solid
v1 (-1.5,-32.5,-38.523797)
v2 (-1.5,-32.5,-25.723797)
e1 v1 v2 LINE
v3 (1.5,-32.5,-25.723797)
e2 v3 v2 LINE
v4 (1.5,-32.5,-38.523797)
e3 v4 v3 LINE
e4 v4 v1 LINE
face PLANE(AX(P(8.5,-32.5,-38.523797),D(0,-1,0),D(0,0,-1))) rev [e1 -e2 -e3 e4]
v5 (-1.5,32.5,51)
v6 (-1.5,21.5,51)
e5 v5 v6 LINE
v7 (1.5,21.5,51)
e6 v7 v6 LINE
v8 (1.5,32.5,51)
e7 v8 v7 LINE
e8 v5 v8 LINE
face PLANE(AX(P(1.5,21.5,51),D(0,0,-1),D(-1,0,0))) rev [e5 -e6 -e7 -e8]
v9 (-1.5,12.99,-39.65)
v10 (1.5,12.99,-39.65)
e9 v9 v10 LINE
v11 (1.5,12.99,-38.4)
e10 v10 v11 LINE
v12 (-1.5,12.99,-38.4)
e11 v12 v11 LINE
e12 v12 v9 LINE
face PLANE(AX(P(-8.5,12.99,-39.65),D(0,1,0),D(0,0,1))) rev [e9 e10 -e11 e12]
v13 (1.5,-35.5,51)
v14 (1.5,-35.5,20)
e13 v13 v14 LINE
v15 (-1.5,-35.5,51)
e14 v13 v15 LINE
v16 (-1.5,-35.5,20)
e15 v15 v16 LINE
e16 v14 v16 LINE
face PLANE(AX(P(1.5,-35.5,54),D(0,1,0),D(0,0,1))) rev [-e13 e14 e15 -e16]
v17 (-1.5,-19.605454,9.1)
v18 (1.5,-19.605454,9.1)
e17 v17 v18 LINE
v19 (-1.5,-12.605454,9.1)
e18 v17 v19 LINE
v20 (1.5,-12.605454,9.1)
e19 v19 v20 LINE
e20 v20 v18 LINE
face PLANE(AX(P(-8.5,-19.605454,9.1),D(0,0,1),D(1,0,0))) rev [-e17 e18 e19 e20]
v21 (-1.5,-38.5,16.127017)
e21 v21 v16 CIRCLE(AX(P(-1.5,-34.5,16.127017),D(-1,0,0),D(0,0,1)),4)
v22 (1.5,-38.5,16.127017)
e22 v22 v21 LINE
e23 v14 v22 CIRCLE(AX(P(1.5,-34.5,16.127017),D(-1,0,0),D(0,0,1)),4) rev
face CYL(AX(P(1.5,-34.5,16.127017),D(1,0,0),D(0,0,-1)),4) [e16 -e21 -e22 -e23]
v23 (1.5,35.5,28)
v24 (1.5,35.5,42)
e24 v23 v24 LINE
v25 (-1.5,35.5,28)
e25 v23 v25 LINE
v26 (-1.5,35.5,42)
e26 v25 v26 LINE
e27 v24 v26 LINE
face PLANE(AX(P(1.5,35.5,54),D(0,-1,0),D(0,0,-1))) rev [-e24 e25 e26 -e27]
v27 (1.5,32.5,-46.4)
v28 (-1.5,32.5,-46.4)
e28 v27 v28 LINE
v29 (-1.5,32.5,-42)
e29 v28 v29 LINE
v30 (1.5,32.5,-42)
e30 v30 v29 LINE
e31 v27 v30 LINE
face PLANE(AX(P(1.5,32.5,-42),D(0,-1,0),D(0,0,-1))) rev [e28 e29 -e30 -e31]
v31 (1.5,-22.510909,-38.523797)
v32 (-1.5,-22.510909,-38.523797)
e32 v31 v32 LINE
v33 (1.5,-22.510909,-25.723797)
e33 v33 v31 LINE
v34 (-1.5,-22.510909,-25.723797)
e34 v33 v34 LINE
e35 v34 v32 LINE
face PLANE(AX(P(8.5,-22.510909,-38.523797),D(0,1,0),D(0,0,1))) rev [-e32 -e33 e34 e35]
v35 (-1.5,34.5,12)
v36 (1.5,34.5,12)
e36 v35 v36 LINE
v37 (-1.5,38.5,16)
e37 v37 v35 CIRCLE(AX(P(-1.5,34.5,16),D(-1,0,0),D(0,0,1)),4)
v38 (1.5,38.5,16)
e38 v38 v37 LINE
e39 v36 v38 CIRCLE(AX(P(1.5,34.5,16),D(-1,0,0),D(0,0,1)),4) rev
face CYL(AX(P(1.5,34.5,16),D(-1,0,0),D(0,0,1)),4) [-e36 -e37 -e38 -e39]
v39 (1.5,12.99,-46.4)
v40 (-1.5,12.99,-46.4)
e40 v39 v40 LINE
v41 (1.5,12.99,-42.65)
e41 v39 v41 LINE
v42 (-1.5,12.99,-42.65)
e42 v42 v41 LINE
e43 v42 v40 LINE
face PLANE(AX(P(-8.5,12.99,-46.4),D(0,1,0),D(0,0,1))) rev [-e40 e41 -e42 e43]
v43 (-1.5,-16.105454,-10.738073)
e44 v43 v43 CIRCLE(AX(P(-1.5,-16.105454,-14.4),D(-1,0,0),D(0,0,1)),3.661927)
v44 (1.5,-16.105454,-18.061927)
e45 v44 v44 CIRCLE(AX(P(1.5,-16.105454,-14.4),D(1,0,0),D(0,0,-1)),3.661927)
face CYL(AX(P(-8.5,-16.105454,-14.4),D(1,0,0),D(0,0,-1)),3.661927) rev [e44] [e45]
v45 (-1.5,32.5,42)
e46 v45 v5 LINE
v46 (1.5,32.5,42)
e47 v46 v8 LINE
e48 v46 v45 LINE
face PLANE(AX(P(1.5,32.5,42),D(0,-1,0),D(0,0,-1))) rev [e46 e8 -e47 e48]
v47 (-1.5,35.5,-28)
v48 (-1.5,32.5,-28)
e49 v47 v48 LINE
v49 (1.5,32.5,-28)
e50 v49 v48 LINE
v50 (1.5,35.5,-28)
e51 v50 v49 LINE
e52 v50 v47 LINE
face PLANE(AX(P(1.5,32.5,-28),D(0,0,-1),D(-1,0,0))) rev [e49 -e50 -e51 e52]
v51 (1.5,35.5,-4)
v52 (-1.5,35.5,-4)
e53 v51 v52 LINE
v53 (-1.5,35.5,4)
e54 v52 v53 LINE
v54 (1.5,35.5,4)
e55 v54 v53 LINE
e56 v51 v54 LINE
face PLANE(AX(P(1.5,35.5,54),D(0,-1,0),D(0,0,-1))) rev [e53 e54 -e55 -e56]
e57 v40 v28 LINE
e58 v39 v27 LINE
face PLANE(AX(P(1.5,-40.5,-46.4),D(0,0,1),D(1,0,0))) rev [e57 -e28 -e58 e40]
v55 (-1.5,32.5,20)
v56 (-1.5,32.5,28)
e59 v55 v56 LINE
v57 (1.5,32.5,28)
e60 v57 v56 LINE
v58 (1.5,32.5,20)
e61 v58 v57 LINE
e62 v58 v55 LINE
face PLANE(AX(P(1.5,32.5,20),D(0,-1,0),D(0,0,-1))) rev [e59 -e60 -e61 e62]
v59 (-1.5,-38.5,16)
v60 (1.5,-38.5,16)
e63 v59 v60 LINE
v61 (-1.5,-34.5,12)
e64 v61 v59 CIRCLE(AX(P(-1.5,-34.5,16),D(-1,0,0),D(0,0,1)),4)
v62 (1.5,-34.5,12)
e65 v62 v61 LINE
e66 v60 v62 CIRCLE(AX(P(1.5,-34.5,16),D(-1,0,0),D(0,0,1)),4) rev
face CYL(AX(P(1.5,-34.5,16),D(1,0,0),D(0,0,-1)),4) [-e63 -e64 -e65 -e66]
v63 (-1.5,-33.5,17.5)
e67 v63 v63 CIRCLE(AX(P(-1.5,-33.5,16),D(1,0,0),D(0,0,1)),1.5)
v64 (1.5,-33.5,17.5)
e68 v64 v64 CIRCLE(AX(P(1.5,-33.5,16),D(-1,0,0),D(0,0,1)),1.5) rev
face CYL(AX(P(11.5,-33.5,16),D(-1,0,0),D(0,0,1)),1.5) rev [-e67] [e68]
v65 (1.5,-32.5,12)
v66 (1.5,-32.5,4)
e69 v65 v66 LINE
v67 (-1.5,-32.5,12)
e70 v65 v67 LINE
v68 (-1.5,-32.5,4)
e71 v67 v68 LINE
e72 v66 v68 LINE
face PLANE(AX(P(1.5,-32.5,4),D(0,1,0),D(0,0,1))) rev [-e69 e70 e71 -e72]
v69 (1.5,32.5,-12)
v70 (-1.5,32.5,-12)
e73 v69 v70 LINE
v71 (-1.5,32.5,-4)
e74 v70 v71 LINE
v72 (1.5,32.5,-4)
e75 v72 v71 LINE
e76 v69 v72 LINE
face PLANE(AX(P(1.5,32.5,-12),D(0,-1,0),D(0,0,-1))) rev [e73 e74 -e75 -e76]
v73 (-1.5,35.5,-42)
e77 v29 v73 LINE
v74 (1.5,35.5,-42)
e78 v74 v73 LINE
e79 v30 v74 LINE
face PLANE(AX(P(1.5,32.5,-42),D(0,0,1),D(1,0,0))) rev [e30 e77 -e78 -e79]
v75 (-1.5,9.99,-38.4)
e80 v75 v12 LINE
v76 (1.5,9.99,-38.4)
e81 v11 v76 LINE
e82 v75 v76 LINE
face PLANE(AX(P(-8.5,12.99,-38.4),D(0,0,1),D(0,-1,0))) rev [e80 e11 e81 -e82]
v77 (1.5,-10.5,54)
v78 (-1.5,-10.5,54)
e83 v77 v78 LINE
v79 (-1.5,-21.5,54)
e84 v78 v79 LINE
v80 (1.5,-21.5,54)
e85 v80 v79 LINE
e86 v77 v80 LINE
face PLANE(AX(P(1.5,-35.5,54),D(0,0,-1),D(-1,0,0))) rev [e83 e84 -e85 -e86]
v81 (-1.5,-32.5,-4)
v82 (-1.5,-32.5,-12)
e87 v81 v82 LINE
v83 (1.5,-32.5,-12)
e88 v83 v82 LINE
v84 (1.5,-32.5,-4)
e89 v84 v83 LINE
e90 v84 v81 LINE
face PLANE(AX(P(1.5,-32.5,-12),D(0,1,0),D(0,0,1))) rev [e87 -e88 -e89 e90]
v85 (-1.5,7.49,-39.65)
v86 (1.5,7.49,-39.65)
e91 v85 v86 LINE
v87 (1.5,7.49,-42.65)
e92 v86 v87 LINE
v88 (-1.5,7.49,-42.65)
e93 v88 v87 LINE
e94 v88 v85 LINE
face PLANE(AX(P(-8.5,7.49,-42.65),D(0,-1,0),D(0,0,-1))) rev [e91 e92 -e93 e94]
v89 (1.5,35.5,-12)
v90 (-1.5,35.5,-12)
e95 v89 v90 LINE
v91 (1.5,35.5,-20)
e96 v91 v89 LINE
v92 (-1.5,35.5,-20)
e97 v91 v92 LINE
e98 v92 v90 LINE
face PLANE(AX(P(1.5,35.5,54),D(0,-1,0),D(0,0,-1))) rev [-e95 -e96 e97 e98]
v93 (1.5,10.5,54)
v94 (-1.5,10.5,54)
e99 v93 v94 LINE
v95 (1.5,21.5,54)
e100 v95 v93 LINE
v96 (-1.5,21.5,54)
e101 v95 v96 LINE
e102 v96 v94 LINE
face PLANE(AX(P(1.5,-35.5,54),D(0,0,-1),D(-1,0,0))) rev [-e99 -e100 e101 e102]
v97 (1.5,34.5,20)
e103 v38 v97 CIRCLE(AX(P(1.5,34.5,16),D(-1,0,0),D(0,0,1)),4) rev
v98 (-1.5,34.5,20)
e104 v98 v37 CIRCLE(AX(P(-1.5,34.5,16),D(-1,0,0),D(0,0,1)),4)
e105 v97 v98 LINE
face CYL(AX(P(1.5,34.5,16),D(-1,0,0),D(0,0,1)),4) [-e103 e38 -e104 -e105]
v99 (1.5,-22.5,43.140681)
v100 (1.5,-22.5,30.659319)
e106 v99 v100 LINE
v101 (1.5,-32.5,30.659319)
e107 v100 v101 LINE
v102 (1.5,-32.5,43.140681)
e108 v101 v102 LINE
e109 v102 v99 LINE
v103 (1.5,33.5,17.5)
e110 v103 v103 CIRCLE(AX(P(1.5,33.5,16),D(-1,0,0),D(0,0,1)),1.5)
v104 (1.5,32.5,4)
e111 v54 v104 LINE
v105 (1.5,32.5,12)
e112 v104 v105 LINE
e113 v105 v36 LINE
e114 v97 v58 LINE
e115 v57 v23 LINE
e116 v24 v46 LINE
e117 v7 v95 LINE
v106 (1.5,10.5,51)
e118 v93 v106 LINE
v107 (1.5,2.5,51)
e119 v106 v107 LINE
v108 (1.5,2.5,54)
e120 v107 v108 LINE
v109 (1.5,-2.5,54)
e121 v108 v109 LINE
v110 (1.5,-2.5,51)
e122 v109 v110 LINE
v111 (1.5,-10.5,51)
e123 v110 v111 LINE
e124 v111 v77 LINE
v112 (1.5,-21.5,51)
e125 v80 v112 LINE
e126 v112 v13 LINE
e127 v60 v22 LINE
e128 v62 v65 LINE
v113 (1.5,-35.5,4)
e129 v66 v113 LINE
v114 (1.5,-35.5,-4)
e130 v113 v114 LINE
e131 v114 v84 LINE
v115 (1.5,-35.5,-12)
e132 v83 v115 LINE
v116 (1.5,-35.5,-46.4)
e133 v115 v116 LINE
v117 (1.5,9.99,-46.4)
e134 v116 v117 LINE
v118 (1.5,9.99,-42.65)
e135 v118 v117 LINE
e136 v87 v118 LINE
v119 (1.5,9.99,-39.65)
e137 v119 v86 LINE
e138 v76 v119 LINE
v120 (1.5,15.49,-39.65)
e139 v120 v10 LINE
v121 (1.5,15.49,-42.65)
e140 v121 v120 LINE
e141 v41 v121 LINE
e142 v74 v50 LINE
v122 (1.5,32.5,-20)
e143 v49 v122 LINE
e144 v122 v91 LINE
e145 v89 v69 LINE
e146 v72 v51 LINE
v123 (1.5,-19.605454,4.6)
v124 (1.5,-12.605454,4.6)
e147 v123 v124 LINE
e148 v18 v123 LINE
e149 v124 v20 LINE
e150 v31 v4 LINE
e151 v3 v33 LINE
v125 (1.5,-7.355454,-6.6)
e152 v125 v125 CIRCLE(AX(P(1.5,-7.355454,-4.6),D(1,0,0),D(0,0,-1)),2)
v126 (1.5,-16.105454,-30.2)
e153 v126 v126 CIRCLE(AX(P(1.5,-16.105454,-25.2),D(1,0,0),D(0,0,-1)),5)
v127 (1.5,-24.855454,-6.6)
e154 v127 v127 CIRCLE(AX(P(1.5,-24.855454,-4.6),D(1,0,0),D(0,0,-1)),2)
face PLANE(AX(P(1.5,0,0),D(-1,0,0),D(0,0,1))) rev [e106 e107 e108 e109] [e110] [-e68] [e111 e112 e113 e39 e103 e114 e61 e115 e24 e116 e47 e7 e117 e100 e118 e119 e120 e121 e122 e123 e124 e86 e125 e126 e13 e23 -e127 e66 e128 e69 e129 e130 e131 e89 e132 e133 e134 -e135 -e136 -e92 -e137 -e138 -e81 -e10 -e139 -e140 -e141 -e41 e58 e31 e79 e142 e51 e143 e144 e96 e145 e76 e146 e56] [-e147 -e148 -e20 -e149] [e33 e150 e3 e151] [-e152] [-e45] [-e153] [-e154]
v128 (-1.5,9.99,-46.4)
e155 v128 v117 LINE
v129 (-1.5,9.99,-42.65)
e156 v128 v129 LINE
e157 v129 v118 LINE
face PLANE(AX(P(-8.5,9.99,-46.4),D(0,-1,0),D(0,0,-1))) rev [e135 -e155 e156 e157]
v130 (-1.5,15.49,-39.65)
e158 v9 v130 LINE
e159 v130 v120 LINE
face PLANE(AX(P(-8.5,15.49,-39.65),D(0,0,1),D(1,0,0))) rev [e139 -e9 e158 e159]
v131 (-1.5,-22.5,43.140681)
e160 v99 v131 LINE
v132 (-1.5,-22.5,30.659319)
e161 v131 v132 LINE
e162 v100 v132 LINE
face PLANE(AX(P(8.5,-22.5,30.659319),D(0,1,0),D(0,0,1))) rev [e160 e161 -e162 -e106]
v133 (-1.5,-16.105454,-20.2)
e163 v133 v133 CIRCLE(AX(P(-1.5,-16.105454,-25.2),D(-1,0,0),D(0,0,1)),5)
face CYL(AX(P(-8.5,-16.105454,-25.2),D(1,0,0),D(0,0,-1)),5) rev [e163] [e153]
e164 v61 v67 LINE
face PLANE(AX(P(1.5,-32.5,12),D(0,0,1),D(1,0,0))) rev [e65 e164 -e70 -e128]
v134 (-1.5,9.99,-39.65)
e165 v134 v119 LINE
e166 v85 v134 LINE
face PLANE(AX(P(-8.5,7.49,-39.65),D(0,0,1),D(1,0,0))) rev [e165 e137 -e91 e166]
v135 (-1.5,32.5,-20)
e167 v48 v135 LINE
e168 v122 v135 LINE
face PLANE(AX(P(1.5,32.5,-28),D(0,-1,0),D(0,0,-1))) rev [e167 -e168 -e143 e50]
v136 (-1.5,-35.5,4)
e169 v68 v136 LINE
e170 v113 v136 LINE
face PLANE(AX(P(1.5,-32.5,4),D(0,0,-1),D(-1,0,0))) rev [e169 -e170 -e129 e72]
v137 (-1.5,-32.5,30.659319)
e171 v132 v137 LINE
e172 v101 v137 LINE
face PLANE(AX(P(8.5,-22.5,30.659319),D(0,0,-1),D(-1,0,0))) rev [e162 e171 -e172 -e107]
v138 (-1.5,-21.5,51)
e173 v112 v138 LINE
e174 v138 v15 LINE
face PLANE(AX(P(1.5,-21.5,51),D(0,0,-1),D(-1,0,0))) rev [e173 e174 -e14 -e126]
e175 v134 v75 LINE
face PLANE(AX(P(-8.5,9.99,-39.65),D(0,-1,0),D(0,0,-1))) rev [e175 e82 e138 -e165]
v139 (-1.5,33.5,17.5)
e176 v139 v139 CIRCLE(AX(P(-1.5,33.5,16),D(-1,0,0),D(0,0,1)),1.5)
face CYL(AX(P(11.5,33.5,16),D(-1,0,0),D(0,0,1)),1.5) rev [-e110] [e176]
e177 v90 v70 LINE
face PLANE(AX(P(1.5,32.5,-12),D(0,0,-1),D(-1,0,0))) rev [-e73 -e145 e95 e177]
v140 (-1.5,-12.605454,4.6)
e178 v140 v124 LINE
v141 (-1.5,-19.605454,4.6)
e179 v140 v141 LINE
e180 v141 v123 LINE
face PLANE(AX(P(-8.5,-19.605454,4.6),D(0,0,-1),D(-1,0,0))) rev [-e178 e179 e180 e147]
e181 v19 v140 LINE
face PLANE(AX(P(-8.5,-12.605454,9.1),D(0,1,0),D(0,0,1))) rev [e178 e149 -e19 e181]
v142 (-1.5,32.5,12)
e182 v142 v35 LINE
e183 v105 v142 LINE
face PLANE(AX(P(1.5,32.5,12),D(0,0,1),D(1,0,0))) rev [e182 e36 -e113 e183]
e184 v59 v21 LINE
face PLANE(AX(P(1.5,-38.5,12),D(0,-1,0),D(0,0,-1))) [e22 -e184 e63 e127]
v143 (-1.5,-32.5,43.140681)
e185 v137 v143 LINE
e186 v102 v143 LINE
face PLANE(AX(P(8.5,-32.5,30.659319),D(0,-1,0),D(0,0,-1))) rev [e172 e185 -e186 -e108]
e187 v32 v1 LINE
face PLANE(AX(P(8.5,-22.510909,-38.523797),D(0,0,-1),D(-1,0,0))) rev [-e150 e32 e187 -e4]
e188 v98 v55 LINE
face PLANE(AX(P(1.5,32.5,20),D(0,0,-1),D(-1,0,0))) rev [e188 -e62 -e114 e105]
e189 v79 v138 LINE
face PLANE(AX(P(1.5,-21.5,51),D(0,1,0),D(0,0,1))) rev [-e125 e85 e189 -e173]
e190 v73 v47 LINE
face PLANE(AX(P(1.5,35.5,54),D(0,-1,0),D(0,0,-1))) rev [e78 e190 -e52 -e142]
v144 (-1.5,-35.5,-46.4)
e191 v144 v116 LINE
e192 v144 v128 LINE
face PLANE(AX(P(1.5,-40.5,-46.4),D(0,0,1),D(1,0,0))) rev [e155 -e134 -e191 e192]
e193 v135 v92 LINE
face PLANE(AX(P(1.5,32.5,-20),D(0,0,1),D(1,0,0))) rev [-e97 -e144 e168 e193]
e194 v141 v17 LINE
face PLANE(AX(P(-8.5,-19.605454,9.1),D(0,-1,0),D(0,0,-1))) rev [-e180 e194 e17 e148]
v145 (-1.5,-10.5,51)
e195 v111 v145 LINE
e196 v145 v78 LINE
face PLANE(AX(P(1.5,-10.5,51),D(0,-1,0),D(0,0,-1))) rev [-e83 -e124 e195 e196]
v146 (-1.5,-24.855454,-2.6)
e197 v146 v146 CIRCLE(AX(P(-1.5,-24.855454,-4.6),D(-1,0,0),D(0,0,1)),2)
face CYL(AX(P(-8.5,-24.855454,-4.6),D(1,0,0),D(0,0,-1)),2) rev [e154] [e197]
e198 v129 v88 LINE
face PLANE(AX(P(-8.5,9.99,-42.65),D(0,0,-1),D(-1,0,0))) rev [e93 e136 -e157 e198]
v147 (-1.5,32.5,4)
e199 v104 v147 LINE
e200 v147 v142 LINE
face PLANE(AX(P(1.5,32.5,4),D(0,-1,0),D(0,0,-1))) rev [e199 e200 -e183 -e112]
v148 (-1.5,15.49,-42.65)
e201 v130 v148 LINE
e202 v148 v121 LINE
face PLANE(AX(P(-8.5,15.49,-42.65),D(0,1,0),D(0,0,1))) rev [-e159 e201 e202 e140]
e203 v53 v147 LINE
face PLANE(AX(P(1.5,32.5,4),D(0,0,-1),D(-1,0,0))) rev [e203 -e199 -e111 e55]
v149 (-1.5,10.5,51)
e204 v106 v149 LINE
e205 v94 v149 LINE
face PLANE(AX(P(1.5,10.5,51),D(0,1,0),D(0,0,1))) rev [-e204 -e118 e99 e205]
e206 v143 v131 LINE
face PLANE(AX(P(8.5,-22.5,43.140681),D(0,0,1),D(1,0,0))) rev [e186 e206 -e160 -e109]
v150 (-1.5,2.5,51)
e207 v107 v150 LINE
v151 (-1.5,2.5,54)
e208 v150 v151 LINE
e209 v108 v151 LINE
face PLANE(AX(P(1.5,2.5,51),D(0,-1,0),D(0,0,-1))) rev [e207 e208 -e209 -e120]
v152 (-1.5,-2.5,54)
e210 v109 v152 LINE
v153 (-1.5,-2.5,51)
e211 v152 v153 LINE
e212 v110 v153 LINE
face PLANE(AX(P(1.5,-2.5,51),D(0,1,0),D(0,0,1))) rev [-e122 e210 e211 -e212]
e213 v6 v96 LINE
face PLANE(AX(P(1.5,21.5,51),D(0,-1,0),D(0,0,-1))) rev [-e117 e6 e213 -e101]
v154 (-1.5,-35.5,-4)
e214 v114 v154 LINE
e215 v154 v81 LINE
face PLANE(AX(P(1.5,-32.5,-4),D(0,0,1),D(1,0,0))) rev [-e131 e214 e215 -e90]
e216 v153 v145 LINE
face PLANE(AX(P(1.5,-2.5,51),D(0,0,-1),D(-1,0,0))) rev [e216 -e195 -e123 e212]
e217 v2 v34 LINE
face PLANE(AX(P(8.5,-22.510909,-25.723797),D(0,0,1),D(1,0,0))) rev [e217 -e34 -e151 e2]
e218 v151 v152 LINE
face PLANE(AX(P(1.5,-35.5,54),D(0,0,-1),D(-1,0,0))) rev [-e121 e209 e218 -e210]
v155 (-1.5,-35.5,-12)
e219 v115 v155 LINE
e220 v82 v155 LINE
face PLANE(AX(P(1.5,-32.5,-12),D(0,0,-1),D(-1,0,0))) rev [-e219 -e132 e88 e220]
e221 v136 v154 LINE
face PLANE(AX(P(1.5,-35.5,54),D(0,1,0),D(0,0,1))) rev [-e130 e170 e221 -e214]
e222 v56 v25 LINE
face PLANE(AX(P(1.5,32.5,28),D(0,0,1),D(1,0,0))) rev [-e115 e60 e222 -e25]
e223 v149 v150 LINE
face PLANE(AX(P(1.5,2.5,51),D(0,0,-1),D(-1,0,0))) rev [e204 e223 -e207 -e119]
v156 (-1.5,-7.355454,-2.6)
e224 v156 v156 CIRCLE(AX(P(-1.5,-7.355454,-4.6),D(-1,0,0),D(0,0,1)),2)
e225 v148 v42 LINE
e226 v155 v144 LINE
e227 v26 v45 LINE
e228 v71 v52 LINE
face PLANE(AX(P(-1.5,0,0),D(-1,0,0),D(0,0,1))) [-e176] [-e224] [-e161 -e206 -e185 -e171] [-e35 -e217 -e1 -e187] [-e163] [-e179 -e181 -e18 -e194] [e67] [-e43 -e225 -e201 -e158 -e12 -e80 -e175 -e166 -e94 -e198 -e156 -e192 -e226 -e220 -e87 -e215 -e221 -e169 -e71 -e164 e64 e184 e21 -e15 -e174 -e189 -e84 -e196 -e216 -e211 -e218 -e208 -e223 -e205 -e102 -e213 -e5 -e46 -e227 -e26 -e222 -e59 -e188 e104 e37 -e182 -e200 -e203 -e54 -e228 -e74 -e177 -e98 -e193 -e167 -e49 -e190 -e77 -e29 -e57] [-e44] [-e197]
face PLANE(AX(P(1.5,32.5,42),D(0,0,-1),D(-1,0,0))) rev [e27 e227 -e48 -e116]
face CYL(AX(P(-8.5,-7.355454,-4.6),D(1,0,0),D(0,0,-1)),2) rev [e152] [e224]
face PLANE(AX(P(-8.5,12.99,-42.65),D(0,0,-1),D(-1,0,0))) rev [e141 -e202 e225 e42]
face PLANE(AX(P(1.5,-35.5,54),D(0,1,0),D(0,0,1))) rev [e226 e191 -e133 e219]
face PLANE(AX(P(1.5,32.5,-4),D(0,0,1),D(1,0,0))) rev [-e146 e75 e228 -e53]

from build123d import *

# Parameters (mm, degrees)
CROQUIS1_W              = 108
CROQUIS1_H              = 71
SALIENTE_EXTRUIR1_DEPTH = 1.5
CROQUIS2_W              = 8
CROQUIS2_H              = 3
CROQUIS2_W_2            = 12
CORTAR_EXTRUIR1_DEPTH   = 3
CROQUIS4_W              = 8
CROQUIS4_H              = 3
SALIENTE_EXTRUIR2_DEPTH = 3
REDONDEO1_R             = 4
CROQUIS5_R              = 1.5
CORTAR_EXTRUIR2_DEPTH   = 13
SIMETR_A2_START         = -1.5
SIMETR_A2_OUTLINE_R     = 1.5
SIMETR_A2_DEPTH         = 3
SIMETR_A2_2_DEPTH       = 3
CROQUIS6_W              = 3
CROQUIS6_H              = 14
CROQUIS6_H_2            = 8
CORTAR_EXTRUIR3_DEPTH   = 3
CROQUIS7_W              = 3.217414859
CROQUIS7_H              = 7.6
CORTAR_EXTRUIR4_DEPTH   = 73
CROQUIS10_W             = 12.8
CROQUIS10_H             = 9.989091156
CORTAR_EXTRUIR7_DEPTH   = 10
CROQUIS11_W             = 12.481361742
CROQUIS11_H             = 10
CORTAR_EXTRUIR8_DEPTH   = 10
CROQUIS12_R             = 2
CROQUIS12_R_2           = 3.661926667
CROQUIS12_R_3           = 5
CROQUIS12_W             = 4.5
CROQUIS12_H             = 7
CORTAR_EXTRUIR9_DEPTH   = 10
CORTAR_EXTRUIR10_DEPTH  = 10


# Read off the part's stored shape, not the designer's step: Simetría2
with BuildPart() as part:
    # Croquis1 → Saliente-Extruir1 (new, symmetric)
    with BuildSketch(Plane(origin=(0, 0, 0), x_dir=(0, 0, -1), z_dir=(1, 0, 0))):
        Rectangle(CROQUIS1_W, CROQUIS1_H)
    extrude(amount=SALIENTE_EXTRUIR1_DEPTH, both=True)

    # Croquis2 → Cortar-Extruir1 (cut)
    with BuildSketch(Plane.ZY.offset(1.5)):
        with Locations((-8, -34)):
            Rectangle(CROQUIS2_W, CROQUIS2_H)
        with Locations((8, -34)):
            Rectangle(CROQUIS2_W, CROQUIS2_H)
        with Locations((48, 34)):
            Rectangle(CROQUIS2_W_2, CROQUIS2_H)
        with Locations((24, 34)):
            Rectangle(CROQUIS2_W, CROQUIS2_H)
        with Locations((8, 34)):
            Rectangle(CROQUIS2_W, CROQUIS2_H)
        with Locations((-8, 34)):
            Rectangle(CROQUIS2_W, CROQUIS2_H)
        with Locations((-24, 34)):
            Rectangle(CROQUIS2_W, CROQUIS2_H)
        with Locations((-48, 34)):
            Rectangle(CROQUIS2_W_2, CROQUIS2_H)
    extrude(amount=-CORTAR_EXTRUIR1_DEPTH, mode=Mode.SUBTRACT)

    # Croquis4 → Saliente-Extruir2 (add)
    with BuildSketch(Plane.ZY.offset(1.5)):
        with Locations((16, 37)):
            Rectangle(CROQUIS4_W, CROQUIS4_H)
    extrude(amount=-SALIENTE_EXTRUIR2_DEPTH)

    # Redondeo1
    redondeo1_edges = [part.edges().sort_by_distance(p)[0] for p in [
        (0, 38.5, 20),
        (0, 38.5, 12),
    ]]
    fillet(redondeo1_edges, radius=REDONDEO1_R - 0.0001)  # a hair under: the kernel refuses the full size

    # Croquis5 → Cortar-Extruir2 (cut)
    with BuildSketch(Plane.ZY.offset(1.5)):
        with Locations((16, 33.5)):
            Circle(CROQUIS5_R)
    extrude(amount=-CORTAR_EXTRUIR2_DEPTH, mode=Mode.SUBTRACT)

    # Simetría2 outline → Simetría2 (cut)
    with BuildSketch(Plane.YZ.offset(SIMETR_A2_START)):
        with BuildLine():
            ThreePointArc((-34.5, 12), (-35.00401717, 12.031881215), (-35.5, 12.127016654))
            Line((-35.5, 12.127016654), (-35.5, 12))
            Line((-35.5, 12), (-34.5, 12))
        make_face()
        with Locations((-33.5, 16)):
            Circle(SIMETR_A2_OUTLINE_R)
    extrude(amount=SIMETR_A2_DEPTH, mode=Mode.SUBTRACT)

    # Simetr_a2 2 outline → Simetr_a2 2 (add)
    with BuildSketch(Plane.YZ.offset(SIMETR_A2_START)):
        with BuildLine():
            ThreePointArc((-35.5, 20), (-37.66227766, 18.576506397), (-38.5, 16.127016654))
            Line((-38.5, 16.127016654), (-38.5, 16))
            ThreePointArc((-38.5, 16), (-37.66227766, 13.550510257), (-35.5, 12.127016654))
            Line((-35.5, 12.127016654), (-35.5, 20))
        make_face()
    extrude(amount=SIMETR_A2_2_DEPTH)

    # Croquis6 → Cortar-Extruir3 (cut)
    with BuildSketch(Plane.ZY.offset(1.5)):
        with Locations((52.5, -28.5)):
            Rectangle(CROQUIS6_W, CROQUIS6_H)
        with Locations((52.5, -6.5)):
            Rectangle(CROQUIS6_W, CROQUIS6_H_2)
        with Locations((52.5, 6.5)):
            Rectangle(CROQUIS6_W, CROQUIS6_H_2)
        with Locations((52.5, 28.5)):
            Rectangle(CROQUIS6_W, CROQUIS6_H)
    extrude(amount=-CORTAR_EXTRUIR3_DEPTH, mode=Mode.SUBTRACT)

    # Croquis7 → Cortar-Extruir4 (cut)
    with BuildSketch(Plane(origin=(0, 32.5, 0), x_dir=(1, 0, 0), z_dir=(0, 1, 0))):
        with Locations((-0.10870743, 50.2)):
            Rectangle(CROQUIS7_W, CROQUIS7_H)
    extrude(amount=-CORTAR_EXTRUIR4_DEPTH, mode=Mode.SUBTRACT)

    # Croquis10 → Cortar-Extruir7 (cut)
    with BuildSketch(Plane.ZY.offset(1.5)):
        with Locations((-32.123797493, -27.505454422)):
            Rectangle(CROQUIS10_W, CROQUIS10_H)
    extrude(amount=-CORTAR_EXTRUIR7_DEPTH, mode=Mode.SUBTRACT)

    # Croquis11 → Cortar-Extruir8 (cut)
    with BuildSketch(Plane.ZY.offset(1.5)):
        with Locations((36.9, -27.5)):
            Rectangle(CROQUIS11_W, CROQUIS11_H)
    extrude(amount=-CORTAR_EXTRUIR8_DEPTH, mode=Mode.SUBTRACT)

    # Croquis12 → Cortar-Extruir9 (cut)
    with BuildSketch(Plane(origin=(1.5, 0, 0), x_dir=(0, 0, -1), z_dir=(1, 0, 0))):
        with Locations((4.6, -7.355454422)):
            Circle(CROQUIS12_R)
        with Locations((4.6, -24.855454422)):
            Circle(CROQUIS12_R)
        with Locations((14.4, -16.105454422)):
            Circle(CROQUIS12_R_2)
        with Locations((25.2, -16.105454422)):
            Circle(CROQUIS12_R_3)
        with Locations((-6.85, -16.105454422)):
            Rectangle(CROQUIS12_W, CROQUIS12_H)
    extrude(amount=-CORTAR_EXTRUIR9_DEPTH, mode=Mode.SUBTRACT)

    # Croquis13 → Cortar-Extruir10 (cut)
    with BuildSketch(Plane(origin=(1.5, 0, 0), x_dir=(0, 0, -1), z_dir=(1, 0, 0))):
        Polygon((46.4, 9.99), (46.4, 12.99), (42.65, 12.99), (42.65, 15.49), (39.65, 15.49), (39.65, 12.99), (38.4, 12.99), (38.4, 9.99), (39.65, 9.99), (39.65, 7.49), (42.65, 7.49), (42.65, 9.99), align=None)
    extrude(amount=-CORTAR_EXTRUIR10_DEPTH, mode=Mode.SUBTRACT)


solid = part.part
